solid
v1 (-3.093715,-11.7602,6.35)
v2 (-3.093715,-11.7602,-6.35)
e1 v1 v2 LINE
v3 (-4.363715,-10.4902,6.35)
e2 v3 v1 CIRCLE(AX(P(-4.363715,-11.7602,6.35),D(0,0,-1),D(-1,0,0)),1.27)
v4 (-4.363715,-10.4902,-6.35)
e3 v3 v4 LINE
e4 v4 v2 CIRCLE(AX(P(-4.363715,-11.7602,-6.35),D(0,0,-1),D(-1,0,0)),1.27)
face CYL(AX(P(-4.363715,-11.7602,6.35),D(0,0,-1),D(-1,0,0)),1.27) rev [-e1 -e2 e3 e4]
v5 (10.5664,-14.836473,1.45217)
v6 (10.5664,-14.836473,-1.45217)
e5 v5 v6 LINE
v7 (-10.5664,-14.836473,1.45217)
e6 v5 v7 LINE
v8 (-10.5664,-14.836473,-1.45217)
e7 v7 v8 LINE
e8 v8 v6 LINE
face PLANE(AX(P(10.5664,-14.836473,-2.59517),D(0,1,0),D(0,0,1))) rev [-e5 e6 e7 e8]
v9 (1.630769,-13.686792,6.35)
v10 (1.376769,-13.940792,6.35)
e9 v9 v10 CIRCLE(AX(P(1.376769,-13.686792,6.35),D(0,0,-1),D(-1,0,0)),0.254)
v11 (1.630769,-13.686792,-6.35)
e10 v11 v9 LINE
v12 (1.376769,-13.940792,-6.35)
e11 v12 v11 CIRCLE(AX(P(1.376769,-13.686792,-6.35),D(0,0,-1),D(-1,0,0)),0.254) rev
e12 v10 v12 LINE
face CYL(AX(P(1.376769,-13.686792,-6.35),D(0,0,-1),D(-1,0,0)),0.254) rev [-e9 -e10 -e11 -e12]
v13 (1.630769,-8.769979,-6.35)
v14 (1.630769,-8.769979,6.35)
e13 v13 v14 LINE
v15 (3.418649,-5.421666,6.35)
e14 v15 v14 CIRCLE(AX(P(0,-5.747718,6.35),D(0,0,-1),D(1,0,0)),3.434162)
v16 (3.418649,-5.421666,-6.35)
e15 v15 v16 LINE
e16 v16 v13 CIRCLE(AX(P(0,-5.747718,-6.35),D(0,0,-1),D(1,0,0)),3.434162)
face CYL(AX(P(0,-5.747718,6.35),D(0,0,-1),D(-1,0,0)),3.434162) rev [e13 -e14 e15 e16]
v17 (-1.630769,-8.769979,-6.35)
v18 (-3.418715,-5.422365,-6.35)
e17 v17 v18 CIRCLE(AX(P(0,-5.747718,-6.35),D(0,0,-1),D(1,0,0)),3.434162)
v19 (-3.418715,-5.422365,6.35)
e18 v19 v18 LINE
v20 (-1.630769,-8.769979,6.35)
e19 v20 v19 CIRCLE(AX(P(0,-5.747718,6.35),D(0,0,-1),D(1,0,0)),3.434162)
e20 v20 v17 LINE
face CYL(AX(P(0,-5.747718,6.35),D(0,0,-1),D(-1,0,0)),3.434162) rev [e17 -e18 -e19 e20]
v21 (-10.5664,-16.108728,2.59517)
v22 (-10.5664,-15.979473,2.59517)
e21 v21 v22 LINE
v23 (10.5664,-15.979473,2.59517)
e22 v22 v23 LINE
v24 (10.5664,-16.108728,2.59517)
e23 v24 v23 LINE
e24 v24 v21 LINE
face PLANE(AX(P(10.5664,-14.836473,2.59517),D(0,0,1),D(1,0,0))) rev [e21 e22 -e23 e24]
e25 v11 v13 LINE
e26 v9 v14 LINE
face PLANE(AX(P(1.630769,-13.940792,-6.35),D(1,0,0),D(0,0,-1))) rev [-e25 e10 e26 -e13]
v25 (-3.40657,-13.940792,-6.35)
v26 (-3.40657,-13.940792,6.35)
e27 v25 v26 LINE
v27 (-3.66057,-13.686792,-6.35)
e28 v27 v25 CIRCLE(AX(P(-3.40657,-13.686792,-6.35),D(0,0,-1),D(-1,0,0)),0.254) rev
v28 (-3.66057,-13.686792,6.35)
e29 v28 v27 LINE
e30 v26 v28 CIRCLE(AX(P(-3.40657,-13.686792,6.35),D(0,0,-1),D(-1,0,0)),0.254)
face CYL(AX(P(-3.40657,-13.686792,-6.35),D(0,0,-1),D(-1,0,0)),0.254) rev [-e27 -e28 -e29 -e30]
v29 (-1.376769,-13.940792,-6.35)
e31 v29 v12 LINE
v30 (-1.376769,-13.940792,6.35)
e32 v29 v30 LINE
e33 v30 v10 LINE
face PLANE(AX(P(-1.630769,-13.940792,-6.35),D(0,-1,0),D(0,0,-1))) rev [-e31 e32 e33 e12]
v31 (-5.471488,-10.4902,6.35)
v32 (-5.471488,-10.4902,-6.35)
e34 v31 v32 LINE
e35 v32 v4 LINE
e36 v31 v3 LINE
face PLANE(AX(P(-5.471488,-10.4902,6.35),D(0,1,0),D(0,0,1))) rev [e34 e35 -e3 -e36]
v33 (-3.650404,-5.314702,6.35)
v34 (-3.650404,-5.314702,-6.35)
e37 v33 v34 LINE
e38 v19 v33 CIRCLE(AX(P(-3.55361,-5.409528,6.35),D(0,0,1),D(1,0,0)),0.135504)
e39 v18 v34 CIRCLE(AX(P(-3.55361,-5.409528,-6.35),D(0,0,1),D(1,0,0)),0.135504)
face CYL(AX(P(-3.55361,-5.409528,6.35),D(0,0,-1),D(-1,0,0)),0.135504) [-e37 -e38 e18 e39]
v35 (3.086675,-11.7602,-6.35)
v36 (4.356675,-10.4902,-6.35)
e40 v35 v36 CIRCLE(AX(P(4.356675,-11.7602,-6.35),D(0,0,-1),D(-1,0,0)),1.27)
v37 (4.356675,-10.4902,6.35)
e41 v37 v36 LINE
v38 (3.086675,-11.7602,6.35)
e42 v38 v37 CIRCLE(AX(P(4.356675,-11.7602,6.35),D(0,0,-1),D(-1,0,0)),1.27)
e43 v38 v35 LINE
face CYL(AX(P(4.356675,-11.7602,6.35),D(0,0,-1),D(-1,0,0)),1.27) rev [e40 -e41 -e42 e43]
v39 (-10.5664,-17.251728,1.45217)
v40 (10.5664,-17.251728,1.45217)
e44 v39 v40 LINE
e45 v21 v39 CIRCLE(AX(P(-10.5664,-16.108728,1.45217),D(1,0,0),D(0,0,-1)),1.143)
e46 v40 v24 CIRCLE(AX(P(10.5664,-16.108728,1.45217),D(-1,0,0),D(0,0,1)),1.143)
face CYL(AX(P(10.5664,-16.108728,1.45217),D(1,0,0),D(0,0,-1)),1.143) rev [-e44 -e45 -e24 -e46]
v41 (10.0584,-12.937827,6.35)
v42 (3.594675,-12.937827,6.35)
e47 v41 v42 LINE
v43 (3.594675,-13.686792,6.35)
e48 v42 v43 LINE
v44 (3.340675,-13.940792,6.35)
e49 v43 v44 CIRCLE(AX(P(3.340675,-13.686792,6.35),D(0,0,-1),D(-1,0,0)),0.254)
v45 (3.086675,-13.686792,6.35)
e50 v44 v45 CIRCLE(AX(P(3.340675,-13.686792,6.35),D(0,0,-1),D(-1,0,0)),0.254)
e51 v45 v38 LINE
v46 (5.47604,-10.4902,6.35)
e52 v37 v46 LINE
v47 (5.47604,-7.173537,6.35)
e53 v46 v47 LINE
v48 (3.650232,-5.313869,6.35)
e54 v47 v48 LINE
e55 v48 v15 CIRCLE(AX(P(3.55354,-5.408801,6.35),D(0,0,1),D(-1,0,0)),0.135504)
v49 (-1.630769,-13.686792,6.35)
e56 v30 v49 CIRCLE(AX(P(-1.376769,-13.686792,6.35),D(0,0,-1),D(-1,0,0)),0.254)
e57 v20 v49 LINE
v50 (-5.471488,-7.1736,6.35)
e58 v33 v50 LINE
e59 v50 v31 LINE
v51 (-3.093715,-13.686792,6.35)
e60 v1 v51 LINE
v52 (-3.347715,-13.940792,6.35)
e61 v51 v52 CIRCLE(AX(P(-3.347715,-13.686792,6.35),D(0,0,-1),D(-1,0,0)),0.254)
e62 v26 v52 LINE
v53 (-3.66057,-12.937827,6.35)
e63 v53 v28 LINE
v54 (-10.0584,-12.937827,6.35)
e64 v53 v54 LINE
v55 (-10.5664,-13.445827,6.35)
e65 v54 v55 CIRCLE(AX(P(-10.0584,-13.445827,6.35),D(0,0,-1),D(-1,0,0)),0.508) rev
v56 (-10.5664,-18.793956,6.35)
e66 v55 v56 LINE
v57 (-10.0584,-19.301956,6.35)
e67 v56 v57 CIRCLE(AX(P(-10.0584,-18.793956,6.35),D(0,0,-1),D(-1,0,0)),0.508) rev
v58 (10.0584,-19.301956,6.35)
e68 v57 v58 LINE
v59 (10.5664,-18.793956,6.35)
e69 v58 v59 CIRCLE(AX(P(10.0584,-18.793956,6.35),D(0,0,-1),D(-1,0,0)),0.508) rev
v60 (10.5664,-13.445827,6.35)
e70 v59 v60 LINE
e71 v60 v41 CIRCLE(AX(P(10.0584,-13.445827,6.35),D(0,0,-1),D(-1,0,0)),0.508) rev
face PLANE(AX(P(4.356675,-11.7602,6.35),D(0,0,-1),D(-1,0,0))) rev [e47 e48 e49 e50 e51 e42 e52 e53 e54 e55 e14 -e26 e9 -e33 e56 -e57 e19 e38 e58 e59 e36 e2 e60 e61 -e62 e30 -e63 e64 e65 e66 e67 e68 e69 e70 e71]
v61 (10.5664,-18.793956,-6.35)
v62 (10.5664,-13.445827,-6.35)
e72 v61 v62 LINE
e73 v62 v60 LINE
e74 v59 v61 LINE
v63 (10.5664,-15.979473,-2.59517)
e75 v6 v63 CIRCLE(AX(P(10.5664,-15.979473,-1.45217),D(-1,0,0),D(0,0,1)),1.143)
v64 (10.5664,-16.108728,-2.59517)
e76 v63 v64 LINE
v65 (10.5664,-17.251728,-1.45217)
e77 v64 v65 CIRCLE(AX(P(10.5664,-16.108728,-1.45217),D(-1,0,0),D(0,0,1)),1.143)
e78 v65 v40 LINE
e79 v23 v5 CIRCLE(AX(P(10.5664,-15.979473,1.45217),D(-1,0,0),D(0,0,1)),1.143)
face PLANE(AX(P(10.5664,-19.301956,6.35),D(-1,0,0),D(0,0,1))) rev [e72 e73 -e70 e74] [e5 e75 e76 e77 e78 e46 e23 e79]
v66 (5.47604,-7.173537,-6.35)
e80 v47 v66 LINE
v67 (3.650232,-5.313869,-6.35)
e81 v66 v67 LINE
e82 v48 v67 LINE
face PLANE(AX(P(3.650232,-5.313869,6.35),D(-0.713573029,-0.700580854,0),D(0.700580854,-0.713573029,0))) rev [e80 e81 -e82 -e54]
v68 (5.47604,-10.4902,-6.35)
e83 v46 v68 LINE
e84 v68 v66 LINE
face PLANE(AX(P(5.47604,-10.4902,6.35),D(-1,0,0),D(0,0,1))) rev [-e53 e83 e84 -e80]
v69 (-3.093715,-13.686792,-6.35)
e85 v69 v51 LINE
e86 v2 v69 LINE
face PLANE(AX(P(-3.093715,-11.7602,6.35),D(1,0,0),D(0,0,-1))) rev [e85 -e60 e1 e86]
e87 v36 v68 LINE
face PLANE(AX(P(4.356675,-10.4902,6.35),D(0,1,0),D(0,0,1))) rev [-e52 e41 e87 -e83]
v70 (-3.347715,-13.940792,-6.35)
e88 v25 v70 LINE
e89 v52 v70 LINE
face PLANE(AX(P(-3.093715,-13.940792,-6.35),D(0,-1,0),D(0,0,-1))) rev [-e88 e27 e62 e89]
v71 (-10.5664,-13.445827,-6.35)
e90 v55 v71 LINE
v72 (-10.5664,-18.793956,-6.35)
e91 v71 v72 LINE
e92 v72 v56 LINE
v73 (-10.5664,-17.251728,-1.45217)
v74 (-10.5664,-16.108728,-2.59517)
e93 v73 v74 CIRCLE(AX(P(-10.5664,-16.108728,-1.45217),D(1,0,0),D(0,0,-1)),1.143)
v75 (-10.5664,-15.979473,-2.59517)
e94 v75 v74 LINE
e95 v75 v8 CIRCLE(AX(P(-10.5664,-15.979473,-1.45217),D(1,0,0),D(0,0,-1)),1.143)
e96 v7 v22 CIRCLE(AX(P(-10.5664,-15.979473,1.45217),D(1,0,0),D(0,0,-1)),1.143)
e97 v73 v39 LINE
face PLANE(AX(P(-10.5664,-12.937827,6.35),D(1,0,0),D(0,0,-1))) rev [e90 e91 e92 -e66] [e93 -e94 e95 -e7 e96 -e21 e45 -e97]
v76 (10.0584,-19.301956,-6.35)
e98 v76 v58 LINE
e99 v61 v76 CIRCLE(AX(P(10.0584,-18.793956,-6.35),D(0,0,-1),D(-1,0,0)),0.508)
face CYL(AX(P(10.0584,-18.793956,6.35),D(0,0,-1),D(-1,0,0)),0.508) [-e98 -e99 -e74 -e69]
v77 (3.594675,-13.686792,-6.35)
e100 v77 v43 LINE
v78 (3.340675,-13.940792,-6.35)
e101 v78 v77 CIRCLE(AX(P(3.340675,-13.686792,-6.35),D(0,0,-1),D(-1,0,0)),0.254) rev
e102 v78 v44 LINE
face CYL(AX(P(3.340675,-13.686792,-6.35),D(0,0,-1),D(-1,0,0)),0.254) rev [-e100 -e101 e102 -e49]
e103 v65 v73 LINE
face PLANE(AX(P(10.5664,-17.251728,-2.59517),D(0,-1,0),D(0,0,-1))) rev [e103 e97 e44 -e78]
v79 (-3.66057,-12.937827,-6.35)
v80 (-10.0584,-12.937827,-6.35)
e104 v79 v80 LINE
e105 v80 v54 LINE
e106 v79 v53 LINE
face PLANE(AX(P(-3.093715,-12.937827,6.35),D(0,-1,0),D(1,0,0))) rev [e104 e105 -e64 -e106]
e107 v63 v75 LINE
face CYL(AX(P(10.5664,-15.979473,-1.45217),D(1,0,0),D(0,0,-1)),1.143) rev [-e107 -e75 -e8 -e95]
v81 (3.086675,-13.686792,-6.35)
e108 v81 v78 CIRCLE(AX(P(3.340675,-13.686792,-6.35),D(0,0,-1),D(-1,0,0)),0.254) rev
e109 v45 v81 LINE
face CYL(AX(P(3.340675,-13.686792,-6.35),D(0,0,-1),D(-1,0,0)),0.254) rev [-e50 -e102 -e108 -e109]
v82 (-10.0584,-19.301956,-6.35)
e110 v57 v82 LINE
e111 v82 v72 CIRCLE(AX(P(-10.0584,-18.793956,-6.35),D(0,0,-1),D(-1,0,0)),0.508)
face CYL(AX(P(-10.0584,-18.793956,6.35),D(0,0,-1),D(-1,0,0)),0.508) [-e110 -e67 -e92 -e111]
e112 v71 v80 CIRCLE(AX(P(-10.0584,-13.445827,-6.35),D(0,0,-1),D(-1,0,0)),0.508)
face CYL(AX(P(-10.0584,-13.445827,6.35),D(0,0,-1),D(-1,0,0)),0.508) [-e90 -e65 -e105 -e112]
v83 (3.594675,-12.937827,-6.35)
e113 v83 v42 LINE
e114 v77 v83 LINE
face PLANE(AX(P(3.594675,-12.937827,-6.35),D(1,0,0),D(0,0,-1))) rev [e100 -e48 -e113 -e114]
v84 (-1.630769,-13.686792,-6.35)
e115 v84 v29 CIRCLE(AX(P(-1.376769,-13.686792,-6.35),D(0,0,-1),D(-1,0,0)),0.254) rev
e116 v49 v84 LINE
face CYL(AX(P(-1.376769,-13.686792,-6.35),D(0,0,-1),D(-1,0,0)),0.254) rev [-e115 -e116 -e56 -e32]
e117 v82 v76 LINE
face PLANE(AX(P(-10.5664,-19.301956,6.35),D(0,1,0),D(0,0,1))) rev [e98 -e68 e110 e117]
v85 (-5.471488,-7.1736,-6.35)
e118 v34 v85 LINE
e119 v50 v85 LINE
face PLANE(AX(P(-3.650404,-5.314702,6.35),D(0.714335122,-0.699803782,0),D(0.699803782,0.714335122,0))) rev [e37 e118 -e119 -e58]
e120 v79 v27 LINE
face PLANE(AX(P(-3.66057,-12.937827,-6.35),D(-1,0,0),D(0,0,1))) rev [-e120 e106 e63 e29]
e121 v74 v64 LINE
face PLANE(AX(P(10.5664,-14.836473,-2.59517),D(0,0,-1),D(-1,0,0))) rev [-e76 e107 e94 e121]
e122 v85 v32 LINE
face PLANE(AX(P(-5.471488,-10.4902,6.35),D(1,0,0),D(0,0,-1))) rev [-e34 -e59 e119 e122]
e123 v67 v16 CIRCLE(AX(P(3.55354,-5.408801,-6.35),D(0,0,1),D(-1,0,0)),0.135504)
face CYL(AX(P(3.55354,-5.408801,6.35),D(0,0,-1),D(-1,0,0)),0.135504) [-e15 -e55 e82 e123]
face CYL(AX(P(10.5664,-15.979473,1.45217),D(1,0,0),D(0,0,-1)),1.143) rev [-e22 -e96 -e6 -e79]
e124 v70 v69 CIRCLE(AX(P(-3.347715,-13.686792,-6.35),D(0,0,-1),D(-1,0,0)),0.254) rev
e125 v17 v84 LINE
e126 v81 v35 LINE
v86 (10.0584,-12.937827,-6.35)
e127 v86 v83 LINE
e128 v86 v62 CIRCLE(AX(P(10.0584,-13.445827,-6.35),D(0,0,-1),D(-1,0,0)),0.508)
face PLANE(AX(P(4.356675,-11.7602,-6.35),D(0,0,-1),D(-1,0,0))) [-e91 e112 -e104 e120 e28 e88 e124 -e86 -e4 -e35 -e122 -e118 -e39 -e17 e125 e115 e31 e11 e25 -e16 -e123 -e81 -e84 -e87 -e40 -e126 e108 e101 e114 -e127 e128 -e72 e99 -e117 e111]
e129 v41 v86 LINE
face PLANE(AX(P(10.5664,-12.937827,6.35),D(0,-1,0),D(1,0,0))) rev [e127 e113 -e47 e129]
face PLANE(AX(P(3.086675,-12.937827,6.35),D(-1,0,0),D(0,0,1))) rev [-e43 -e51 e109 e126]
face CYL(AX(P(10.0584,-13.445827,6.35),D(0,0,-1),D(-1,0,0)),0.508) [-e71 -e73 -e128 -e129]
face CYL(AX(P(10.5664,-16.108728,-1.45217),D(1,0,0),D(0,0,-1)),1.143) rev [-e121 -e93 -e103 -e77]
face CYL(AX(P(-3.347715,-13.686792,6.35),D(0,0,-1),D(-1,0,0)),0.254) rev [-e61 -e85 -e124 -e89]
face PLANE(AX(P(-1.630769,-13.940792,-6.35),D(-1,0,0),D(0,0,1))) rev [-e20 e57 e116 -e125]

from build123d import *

# Parameters (mm, degrees)
BOSS_EXTRUDE9_DEPTH      = 6.35
SKETCH4_W                = 3.261538064
SKETCH4_H                = 3.965348827
CUT_EXTRUDE2_DEPTH       = 26.406776986
SKETCH5_W                = 1.630769032
SKETCH5_H                = 1.267236454
CUT_EXTRUDE6_DEPTH       = 26.406776986
SKETCH6_W                = 1.630769032
SKETCH6_H                = 1.247570224
CUT_EXTRUDE7_DEPTH       = 26.406776986
CUT_EXTRUDE9_DEPTH       = 23.902768758
CUT_EXTRUDE9_DEPTH_BACK  = 23.902768758
SKETCH8_W                = 0.566855721
SKETCH8_H                = 1.002964872
CUT_EXTRUDE10_DEPTH      = 26.406776986
CUT_EXTRUDE10_DEPTH_BACK = 26.406776986
SKETCH9_W                = 0.508
SKETCH9_H                = 1.002964872
FILLET1_R                = 0.254
FILLET2_R                = 0.254
FILLET3_R                = 0.254
FILLET4_R                = 0.508
FILLET5_R                = 0.508
SKETCH11_W               = 5.19034067
SKETCH11_H               = 2.415254944
CUT_EXTRUDE11_DEPTH      = 30.316944626
FILLET6_R                = 1.143


with BuildPart() as part:
    # Sketch2 → Boss-Extrude9 (new, symmetric)
    with BuildSketch(Plane.XY):
        with BuildLine():
            Line((-5.471488307, -10.4902), (-4.36371454, -10.4902))
            ThreePointArc((-4.36371454, -10.4902), (-3.465688928, -10.862174388), (-3.09371454, -11.7602))
            Line((-3.09371454, -11.7602), (-3.09371454, -12.937827191))
            Line((-3.09371454, -12.937827191), (-10.566399977, -12.937827191))
            Line((-10.566399977, -12.937827191), (-10.566399977, -19.301956075))
            Line((-10.566399977, -19.301956075), (10.566399977, -19.301956075))
            Line((10.566399977, -19.301956075), (10.566399977, -12.937827191))
            Line((10.566399977, -12.937827191), (3.086674887, -12.937827191))
            Line((3.086674887, -12.937827191), (3.086674887, -11.7602))
            ThreePointArc((3.086674887, -11.7602), (3.458649275, -10.862174388), (4.356674887, -10.4902))
            Line((4.356674887, -10.4902), (5.476039751, -10.4902))
            Line((5.476039751, -10.4902), (5.476039751, -7.173536635))
            Line((5.476039751, -7.173536635), (3.650231899, -5.31386943))
            ThreePointArc((3.650231899, -5.31386943), (3.496357897, -5.285953607), (3.418648834, -5.421665813))
            ThreePointArc((3.418648834, -5.421665813), (0.00035136, -9.18188013), (-3.418715481, -5.422365367))
            ThreePointArc((-3.418715481, -5.422365367), (-3.496506609, -5.286643819), (-3.650404442, -5.314701882))
            Line((-3.650404442, -5.314701882), (-5.471488307, -7.173600332))
            Line((-5.471488307, -7.173600332), (-5.471488307, -10.4902))
        make_face()
    extrude(amount=BOSS_EXTRUDE9_DEPTH, both=True)

    # Sketch4 → Cut-Extrude2 (cut, through all)
    with BuildSketch(Plane.XY.offset(6.35)):
        with Locations((0, -11.95811765)):
            Rectangle(SKETCH4_W, SKETCH4_H)
    extrude(amount=-CUT_EXTRUDE2_DEPTH, mode=Mode.SUBTRACT)

    # Sketch5 → Cut-Extrude6 (cut, through all)
    with BuildSketch(Plane.XY.offset(6.35)):
        with Locations((-0.815384516, -9.341825009)):
            Rectangle(SKETCH5_W, SKETCH5_H)
    extrude(amount=-CUT_EXTRUDE6_DEPTH, mode=Mode.SUBTRACT)

    # Sketch6 → Cut-Extrude7 (cut, through all)
    with BuildSketch(Plane(origin=(0, 0, -6.35), x_dir=(-1, 0, 0), z_dir=(0, 0, -1))):
        with Locations((-0.815384516, -9.351658124)):
            Rectangle(SKETCH6_W, SKETCH6_H)
    extrude(amount=-CUT_EXTRUDE7_DEPTH, mode=Mode.SUBTRACT)

    # Sketch8 → Cut-Extrude9 (cut, two sides: drawn at the far end of the back side and taken through both)
    with BuildSketch(Plane.XY.offset(-CUT_EXTRUDE9_DEPTH_BACK)):
        with Locations((-3.377142401, -13.439309627)):
            Rectangle(SKETCH8_W, SKETCH8_H)
    extrude(amount=CUT_EXTRUDE9_DEPTH + CUT_EXTRUDE9_DEPTH_BACK, mode=Mode.SUBTRACT)

    # Sketch9 → Cut-Extrude10 (cut, two sides: drawn at the far end of the back side and taken through both)
    with BuildSketch(Plane.XY.offset(6.35).offset(-CUT_EXTRUDE10_DEPTH_BACK)):
        with Locations((3.340674887, -13.439309627)):
            Rectangle(SKETCH9_W, SKETCH9_H)
    extrude(amount=CUT_EXTRUDE10_DEPTH + CUT_EXTRUDE10_DEPTH_BACK, mode=Mode.SUBTRACT)

    # Fillet1
    fillet1_edges = [part.edges().sort_by_distance(p)[0] for p in [
        (-3.09371454, -13.940792063, 0),
    ]]
    fillet(fillet1_edges, radius=FILLET1_R)

    # Fillet2
    fillet2_edges = [part.edges().sort_by_distance(p)[0] for p in [
        (-3.660570261, -13.940792063, 0),
    ]]
    fillet(fillet2_edges, radius=FILLET2_R)

    # Fillet3
    fillet3_edges = [part.edges().sort_by_distance(p)[0] for p in [
        (3.594674887, -13.940792063, 0),
        (3.086674887, -13.940792063, 0),
        (1.630769032, -13.940792063, 0),
        (-1.630769032, -13.940792063, 0),
    ]]
    fillet(fillet3_edges, radius=FILLET3_R - 0.0001)  # a hair under: the kernel refuses the full size

    # Fillet4
    fillet4_edges = [part.edges().sort_by_distance(p)[0] for p in [
        (-10.566399977, -12.937827191, 0),
    ]]
    fillet(fillet4_edges, radius=FILLET4_R)

    # Fillet5
    fillet5_edges = [part.edges().sort_by_distance(p)[0] for p in [
        (-10.566399977, -19.301956075, 0),
        (10.566399977, -12.937827191, 0),
        (10.566399977, -19.301956075, 0),
    ]]
    fillet(fillet5_edges, radius=FILLET5_R)

    # Sketch11 → Cut-Extrude11 (cut, through all)
    with BuildSketch(Plane.ZY.offset(10.566399977)):
        with Locations((0, -16.044100378)):
            Rectangle(SKETCH11_W, SKETCH11_H)
    extrude(amount=-CUT_EXTRUDE11_DEPTH, mode=Mode.SUBTRACT)

    # Fillet6
    fillet6_edges = [part.edges().sort_by_distance(p)[0] for p in [
        (0, -14.836472906, 2.595170335),
        (0, -17.25172785, 2.595170335),
        (0, -17.25172785, -2.595170335),
        (0, -14.836472906, -2.595170335),
    ]]
    fillet(fillet6_edges, radius=FILLET6_R)


solid = part.part
